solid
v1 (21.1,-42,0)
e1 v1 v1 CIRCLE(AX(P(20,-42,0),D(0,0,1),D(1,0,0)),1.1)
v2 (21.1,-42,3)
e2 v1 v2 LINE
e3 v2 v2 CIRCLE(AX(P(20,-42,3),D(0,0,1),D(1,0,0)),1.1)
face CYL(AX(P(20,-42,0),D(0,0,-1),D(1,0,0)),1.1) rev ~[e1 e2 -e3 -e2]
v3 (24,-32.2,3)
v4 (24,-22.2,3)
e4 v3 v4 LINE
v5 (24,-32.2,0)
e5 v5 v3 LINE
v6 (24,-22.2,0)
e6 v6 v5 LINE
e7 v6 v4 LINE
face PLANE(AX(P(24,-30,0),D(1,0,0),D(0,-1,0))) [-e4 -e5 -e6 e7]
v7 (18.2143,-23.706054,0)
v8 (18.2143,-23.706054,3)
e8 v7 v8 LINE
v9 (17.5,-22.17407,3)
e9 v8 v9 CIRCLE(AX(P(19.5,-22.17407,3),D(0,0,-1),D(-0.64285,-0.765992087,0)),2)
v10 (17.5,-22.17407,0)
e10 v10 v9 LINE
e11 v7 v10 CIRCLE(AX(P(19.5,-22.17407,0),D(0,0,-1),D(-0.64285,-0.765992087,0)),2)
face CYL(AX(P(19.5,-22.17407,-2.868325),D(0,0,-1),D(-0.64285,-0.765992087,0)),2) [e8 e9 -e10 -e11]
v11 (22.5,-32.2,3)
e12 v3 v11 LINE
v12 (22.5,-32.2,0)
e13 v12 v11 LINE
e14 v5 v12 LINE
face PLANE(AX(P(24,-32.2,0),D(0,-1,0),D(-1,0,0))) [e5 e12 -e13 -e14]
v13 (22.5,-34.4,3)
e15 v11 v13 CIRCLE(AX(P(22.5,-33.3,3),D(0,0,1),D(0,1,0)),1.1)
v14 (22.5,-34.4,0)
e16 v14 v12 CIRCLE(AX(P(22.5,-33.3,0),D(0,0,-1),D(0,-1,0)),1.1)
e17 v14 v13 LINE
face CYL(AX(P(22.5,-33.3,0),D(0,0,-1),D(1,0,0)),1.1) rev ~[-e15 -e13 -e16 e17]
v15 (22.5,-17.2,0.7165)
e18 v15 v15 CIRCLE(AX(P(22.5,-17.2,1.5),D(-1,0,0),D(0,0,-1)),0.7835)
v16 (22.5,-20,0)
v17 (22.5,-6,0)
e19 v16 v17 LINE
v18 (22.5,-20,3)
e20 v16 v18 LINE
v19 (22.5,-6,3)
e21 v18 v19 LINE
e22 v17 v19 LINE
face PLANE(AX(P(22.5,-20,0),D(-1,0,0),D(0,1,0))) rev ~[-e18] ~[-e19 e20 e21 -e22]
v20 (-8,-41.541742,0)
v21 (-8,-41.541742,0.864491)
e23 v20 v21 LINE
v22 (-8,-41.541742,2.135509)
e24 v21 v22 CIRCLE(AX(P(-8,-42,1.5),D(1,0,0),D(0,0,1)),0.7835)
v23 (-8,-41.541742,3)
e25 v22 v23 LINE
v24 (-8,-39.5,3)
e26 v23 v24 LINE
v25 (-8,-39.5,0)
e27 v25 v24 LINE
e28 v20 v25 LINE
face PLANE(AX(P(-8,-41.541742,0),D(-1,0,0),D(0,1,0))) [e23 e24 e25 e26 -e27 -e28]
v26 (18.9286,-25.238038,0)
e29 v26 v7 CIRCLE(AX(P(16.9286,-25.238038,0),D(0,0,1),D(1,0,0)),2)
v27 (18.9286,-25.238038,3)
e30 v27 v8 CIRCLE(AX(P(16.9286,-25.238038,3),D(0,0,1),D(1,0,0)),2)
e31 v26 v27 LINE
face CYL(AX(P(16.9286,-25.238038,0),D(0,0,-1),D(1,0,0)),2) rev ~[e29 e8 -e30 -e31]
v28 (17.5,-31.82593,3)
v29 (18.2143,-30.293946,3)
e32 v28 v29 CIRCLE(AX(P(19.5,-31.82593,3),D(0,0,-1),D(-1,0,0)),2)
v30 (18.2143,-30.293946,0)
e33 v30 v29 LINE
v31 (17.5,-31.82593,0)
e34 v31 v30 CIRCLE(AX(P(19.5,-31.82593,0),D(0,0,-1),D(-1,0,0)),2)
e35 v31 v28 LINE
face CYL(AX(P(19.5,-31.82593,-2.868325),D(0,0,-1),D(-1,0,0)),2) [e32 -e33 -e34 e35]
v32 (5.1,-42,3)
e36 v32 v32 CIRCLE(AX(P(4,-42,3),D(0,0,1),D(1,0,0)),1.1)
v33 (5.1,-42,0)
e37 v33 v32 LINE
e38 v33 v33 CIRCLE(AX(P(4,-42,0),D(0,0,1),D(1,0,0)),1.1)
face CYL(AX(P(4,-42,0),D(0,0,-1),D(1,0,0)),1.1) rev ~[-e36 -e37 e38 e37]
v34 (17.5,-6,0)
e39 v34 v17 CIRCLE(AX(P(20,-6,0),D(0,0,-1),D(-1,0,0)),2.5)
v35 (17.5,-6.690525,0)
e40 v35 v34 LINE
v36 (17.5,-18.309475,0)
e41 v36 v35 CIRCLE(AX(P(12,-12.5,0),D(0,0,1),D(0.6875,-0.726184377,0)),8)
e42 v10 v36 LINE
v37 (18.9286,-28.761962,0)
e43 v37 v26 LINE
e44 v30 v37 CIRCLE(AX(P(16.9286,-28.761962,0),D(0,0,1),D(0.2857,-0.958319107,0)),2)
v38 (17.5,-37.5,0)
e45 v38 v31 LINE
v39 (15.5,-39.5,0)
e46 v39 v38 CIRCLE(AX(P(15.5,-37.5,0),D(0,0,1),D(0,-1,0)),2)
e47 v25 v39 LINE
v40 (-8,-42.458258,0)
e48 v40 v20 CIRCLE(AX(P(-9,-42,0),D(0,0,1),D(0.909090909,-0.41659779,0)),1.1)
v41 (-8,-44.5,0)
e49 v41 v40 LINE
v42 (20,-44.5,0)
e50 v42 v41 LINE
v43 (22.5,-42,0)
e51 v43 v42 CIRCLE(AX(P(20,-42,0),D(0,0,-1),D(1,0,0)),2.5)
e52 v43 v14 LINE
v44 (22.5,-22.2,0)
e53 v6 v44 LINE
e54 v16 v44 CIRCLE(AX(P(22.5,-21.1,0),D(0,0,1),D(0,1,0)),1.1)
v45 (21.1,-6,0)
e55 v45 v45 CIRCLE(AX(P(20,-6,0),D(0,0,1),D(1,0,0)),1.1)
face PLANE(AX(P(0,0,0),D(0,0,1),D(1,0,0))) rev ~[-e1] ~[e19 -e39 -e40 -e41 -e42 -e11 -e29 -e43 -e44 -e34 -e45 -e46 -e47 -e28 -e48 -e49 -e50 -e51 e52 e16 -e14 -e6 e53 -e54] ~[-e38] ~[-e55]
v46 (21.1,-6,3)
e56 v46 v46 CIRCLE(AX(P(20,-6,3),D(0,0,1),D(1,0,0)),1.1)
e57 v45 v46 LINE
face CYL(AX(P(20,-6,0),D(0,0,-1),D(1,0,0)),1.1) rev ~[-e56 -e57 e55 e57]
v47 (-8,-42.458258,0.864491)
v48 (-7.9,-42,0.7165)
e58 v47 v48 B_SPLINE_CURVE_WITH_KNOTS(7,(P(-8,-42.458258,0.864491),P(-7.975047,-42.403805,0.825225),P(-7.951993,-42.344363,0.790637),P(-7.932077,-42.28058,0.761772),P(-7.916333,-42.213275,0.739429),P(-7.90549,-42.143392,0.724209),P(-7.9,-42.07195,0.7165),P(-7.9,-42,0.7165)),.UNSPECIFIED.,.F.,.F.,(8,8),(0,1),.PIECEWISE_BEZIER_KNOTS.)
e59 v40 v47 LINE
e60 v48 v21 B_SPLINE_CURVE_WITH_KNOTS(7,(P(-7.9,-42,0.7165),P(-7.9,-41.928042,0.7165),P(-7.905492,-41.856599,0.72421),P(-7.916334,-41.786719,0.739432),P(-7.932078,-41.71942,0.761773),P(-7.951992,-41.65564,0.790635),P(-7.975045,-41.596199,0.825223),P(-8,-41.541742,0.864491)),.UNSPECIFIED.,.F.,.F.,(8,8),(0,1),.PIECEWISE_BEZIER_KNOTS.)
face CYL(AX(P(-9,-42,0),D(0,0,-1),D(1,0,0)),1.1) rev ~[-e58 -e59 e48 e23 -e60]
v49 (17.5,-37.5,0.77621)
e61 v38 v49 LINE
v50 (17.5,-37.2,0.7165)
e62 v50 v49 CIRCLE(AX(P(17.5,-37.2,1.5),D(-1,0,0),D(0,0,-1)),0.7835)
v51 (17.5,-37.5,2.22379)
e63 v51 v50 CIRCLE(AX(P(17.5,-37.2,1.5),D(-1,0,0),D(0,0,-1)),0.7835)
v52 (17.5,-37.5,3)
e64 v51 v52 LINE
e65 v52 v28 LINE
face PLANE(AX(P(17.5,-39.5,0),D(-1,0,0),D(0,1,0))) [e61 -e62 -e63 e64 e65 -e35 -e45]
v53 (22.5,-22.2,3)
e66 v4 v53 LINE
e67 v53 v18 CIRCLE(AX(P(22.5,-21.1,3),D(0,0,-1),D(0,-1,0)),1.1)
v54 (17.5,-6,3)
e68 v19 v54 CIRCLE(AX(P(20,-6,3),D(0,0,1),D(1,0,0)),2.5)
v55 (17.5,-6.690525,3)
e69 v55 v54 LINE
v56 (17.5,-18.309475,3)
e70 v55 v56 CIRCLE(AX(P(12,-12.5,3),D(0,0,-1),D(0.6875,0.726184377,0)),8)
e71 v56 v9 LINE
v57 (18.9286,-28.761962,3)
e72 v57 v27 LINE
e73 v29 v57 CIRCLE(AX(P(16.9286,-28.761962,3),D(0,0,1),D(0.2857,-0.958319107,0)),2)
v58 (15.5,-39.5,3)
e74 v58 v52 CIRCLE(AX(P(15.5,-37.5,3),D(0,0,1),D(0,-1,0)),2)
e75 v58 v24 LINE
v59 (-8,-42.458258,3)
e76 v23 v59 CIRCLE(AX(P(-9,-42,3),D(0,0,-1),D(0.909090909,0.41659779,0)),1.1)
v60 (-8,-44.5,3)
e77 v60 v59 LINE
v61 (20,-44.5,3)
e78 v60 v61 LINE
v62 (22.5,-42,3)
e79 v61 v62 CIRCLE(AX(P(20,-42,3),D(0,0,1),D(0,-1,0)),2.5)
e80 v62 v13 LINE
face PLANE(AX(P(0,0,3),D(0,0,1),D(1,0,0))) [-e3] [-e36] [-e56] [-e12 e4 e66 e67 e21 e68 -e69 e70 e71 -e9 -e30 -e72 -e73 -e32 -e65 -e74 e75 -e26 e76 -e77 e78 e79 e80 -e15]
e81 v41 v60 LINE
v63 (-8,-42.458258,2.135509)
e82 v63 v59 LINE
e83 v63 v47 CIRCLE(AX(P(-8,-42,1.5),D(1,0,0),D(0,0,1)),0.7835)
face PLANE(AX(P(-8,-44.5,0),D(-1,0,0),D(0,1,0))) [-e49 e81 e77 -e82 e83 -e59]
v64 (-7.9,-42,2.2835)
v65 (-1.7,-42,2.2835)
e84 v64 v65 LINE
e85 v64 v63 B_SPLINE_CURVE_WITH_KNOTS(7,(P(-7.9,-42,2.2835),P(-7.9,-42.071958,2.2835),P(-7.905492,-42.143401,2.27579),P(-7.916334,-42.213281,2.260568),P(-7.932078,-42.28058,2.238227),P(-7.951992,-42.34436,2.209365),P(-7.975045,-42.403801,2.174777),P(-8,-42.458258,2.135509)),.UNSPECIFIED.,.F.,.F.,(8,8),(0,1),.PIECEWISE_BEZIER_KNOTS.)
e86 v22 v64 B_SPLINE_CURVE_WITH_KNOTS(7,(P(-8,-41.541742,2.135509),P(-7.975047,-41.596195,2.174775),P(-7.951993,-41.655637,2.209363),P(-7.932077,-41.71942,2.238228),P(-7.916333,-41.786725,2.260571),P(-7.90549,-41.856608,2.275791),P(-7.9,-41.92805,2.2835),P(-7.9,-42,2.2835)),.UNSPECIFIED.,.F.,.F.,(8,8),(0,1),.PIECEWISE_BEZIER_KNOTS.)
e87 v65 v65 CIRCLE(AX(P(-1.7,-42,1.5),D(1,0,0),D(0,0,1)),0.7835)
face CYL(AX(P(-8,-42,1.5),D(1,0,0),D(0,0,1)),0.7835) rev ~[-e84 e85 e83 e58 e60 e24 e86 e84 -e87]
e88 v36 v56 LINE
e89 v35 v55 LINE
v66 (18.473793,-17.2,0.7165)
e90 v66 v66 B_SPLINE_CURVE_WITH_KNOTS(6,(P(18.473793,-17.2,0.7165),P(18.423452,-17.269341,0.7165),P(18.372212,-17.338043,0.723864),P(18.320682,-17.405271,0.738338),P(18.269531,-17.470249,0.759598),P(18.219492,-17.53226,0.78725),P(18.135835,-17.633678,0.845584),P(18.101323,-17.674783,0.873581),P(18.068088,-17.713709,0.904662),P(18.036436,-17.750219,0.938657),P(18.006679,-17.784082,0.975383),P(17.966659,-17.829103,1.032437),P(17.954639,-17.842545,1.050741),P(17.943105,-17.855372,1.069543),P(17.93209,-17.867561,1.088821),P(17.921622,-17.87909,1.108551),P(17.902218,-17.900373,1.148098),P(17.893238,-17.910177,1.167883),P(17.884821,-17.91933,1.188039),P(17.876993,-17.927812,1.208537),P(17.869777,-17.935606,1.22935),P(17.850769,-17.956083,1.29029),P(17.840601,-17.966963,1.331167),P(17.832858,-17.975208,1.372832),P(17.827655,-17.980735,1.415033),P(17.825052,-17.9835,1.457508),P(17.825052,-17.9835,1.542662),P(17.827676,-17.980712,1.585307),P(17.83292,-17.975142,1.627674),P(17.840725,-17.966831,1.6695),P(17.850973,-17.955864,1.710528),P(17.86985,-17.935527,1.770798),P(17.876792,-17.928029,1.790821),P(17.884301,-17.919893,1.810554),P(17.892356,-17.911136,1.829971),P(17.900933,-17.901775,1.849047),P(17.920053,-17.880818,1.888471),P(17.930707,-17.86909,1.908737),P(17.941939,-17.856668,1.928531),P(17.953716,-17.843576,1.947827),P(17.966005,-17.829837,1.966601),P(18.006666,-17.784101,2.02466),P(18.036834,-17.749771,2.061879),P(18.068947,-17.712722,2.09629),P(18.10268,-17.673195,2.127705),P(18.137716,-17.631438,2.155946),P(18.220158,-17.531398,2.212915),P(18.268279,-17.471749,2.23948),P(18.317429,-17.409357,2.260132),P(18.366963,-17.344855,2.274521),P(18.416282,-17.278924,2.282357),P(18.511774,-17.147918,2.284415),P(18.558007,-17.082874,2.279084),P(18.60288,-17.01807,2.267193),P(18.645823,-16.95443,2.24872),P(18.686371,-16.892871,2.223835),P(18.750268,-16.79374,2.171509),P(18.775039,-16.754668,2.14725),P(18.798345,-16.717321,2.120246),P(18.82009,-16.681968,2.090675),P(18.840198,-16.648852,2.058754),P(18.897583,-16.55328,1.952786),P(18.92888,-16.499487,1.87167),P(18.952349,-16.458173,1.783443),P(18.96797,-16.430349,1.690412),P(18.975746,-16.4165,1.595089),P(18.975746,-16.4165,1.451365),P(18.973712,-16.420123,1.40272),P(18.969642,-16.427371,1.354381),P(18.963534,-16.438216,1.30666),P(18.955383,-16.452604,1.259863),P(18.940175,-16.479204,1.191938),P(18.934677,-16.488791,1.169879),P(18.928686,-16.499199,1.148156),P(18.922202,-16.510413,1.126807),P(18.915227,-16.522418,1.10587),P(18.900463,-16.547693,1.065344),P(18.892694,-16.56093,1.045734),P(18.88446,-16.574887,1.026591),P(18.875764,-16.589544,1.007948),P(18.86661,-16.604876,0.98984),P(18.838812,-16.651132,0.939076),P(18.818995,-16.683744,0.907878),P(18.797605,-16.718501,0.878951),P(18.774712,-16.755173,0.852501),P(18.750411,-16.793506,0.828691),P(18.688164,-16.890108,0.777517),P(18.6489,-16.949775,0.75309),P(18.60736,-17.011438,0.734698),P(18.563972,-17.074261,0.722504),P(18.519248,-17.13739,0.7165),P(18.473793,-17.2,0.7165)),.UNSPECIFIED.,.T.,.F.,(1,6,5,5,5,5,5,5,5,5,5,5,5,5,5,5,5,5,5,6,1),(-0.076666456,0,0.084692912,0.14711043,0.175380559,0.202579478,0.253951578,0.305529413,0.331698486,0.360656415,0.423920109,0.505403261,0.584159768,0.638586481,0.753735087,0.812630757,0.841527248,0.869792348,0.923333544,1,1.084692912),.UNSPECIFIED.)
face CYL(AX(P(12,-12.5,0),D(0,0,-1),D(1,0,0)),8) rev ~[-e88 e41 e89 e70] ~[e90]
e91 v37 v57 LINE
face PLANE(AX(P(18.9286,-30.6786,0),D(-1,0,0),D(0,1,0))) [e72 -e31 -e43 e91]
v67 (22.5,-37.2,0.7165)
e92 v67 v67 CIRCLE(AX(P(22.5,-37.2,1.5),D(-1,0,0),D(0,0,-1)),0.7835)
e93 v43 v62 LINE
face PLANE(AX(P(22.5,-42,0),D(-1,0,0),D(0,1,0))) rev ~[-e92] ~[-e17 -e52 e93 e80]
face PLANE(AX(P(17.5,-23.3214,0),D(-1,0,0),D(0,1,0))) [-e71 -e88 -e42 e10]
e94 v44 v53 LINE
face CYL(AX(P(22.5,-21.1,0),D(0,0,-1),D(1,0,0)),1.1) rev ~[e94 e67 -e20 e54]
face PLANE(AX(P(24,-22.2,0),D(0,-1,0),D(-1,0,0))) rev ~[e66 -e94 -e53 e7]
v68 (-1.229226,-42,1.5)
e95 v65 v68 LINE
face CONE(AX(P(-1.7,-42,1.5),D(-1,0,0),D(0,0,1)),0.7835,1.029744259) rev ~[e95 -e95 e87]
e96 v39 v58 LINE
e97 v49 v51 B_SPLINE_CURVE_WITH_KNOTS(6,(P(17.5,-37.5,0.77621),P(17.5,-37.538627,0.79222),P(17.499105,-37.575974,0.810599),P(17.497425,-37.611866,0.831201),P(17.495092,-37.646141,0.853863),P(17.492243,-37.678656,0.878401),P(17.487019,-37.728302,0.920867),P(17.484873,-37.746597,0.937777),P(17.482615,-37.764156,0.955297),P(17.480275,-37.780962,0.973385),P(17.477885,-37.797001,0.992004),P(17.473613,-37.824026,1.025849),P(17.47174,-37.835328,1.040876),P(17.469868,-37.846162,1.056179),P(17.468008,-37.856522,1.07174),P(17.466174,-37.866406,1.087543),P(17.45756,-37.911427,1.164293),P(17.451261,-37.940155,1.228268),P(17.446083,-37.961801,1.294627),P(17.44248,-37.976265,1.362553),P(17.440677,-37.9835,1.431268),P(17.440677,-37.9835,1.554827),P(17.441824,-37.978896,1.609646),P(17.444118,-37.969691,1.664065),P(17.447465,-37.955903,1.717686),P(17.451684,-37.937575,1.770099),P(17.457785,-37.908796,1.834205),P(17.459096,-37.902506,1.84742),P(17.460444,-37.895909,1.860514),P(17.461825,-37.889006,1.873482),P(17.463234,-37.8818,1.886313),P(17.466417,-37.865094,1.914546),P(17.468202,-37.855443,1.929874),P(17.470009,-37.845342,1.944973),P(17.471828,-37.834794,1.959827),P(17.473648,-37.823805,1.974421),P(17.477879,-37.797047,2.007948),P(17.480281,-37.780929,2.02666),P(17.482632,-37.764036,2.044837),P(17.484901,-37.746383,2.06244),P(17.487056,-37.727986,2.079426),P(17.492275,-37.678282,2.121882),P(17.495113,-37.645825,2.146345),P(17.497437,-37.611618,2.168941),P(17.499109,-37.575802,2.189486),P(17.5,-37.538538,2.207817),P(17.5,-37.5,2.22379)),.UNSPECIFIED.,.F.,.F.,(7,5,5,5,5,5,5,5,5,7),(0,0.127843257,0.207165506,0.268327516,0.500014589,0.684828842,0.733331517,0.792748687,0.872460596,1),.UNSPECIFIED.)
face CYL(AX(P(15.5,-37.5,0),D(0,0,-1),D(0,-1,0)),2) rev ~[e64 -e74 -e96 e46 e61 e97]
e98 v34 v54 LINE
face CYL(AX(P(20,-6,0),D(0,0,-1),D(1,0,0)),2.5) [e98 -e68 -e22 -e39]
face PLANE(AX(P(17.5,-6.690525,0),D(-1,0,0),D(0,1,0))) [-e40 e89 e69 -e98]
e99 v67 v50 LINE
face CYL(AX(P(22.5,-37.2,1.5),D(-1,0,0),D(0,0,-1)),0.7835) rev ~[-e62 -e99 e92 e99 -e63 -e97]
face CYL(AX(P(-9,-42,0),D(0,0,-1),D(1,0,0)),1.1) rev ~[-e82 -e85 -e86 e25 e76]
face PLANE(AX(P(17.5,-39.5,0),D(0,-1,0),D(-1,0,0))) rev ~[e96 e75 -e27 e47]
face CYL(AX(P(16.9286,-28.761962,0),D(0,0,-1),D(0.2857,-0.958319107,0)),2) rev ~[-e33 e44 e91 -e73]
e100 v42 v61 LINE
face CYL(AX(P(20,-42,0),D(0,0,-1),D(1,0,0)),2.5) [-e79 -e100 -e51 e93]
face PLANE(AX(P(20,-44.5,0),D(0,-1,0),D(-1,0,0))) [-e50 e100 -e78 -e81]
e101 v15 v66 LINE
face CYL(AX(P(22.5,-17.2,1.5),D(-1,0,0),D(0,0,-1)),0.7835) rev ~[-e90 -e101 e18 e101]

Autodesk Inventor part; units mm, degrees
ref_plane "YZ Plane" through (0, 0, 0) normal (1, 0, 0) x (0, 1, 0)
ref_plane "XZ Plane" through (0, 0, 0) normal (0, 1, 0) x (-1, 0, 0)
ref_plane "XY Plane" through (0, 0, 0) normal (0, 0, 1) x (1, 0, 0)
sketch "スケッチ1" plane through (0, 0, 0) normal (0, 0, 1) x (1, 0, 0)
  circle A0 centre (20, -42) radius 1 projected
  circle A1 centre (4, -42) radius 1 projected
  circle A2 centre (20, -6) radius 1 projected
  circle A3 centre (20, -42) radius 1.1
  line L0 (22.5, -78.2) -> (22.5, -32.2) projected
  circle A4 centre (20, -42) radius 2.5
  circle A5 centre (20, -6) radius 2.5
  circle A6 centre (20, -6) radius 1.1
  circle A7 centre (4, -42) radius 1.1
  circle A8 centre (4, -42) radius 2.5
  line L1 (-8, -45.7) -> (-8, -64.7) projected
  line L2 (-8, -44.5) -> (-8, -39.5)
  line L3 (17.5, -42) -> (17.5, -6)
  line L4 (20, -39.5) -> (-8, -39.5)
  line L5 (20, -44.5) -> (4, -44.5)
  line L6 (4, -44.5) -> (-8, -44.5)
  line L7 (24, -24.4) -> (24, -30) projected
  line L8 (24, -32.2) -> (22.5, -32.2) projected
  line L9 (24, -22.2) -> (22.5, -22.2) projected
  line L10 (24, -32.2) -> (22.5, -32.2)
  line L11 (22.5, -32.2) -> (22.5, -22.2)
  line L12 (22.5, -22.2) -> (24, -22.2)
  line L13 (24, -22.2) -> (24, -32.2)
  line L14 (22.5, -22.2) -> (22.5, -6)
  line L15 (2, -43.5) -> (2, -4.5) projected
  arc A9 (2, -43.5) -> (2.5, -44) centre (2.5, -43.5) ccw projected
  line L16 (21.5, -44) -> (2.5, -44) projected
  arc A10 (21.5, -44) -> (22, -43.5) centre (21.5, -43.5) ccw projected
  line L17 (22, -4.5) -> (22, -43.5) projected
  arc A11 (22, -4.5) -> (21.5, -4) centre (21.5, -4.5) ccw projected
  line L18 (2.5, -4) -> (21.5, -4) projected
  arc A12 (2.5, -4) -> (2, -4.5) centre (2.5, -4.5) ccw projected
  line L19 (18.4286, -23.8214) -> (18.4286, -30.1786) projected
  line L20 (18.4286, -30.1786) -> (14.5714, -30.1786) projected
  line L21 (14.5714, -30.1786) -> (14.5714, -23.8214) projected
  line L22 (14.5714, -23.8214) -> (18.4286, -23.8214) projected
  circle A13 centre (12, -31.4) radius 1.1519 projected
  line L23 (5.5714, -23.8214) -> (9.4286, -23.8214) projected
  line L24 (9.4286, -23.8214) -> (9.4286, -30.1786) projected
  line L25 (9.4286, -30.1786) -> (5.5714, -30.1786) projected
  line L26 (5.5714, -30.1786) -> (5.5714, -23.8214) projected
  circle A14 centre (20, -6) radius 1.8131 projected
  circle A15 centre (4, -6) radius 1.8131 projected
  circle A16 centre (20, -42) radius 1.8131 projected
  circle A17 centre (4, -42) radius 1.8131 projected
  arc A18 (18.25, -12.4893) -> (5.75, -12.5) centre (12, -12.5) ccw projected
  arc A19 (18.5, -12.25) -> (18.2502, -12.4893) centre (18.5, -12.5) ccw projected
  line L27 (18.5, -12.25) -> (20.25, -12.25) projected
  arc A20 (20.25, -12.75) -> (20.25, -12.25) centre (20.25, -12.5) ccw projected
  line L28 (20.25, -12.75) -> (18.5, -12.75) projected
  arc A21 (18.25, -12.5) -> (18.5, -12.75) centre (18.5, -12.5) ccw projected
  arc A22 (17.7742, -14.8918) -> (18.25, -12.5) centre (12, -12.5) ccw projected
  arc A23 (18.1009, -14.7565) -> (17.7742, -14.8918) centre (18.0052, -14.9874) ccw projected
  line L29 (18.1009, -14.7565) -> (19.7177, -15.4262) projected
  arc A24 (19.5263, -15.8881) -> (19.7177, -15.4262) centre (19.622, -15.6571) ccw projected
  line L30 (19.5263, -15.8881) -> (17.9095, -15.2184) projected
  arc A25 (17.7742, -14.8918) -> (17.9095, -15.2184) centre (18.0052, -14.9874) ccw projected
  arc A26 (16.4194, -16.9194) -> (17.7742, -14.8918) centre (12, -12.5) ccw projected
  arc A27 (16.773, -16.9194) -> (16.4194, -16.9194) centre (16.5962, -17.0962) ccw projected
  line L31 (16.773, -16.9194) -> (18.0104, -18.1569) projected
  arc A28 (17.6569, -18.5104) -> (18.0104, -18.1569) centre (17.8336, -18.3336) ccw projected
  line L32 (17.6569, -18.5104) -> (16.4194, -17.273) projected
  arc A29 (16.4194, -16.9194) -> (16.4194, -17.273) centre (16.5962, -17.0962) ccw projected
  arc A30 (14.3918, -18.2742) -> (16.4194, -16.9194) centre (12, -12.5) ccw projected
  arc A31 (14.7184, -18.4095) -> (14.3918, -18.2742) centre (14.4874, -18.5052) ccw projected
  line L33 (14.7184, -18.4095) -> (15.3881, -20.0263) projected
  arc A32 (14.9262, -20.2177) -> (15.3881, -20.0263) centre (15.1571, -20.122) ccw projected
  line L34 (14.9262, -20.2177) -> (14.2565, -18.6009) projected
  arc A33 (14.3918, -18.2742) -> (14.2565, -18.6009) centre (14.4874, -18.5052) ccw projected
  arc A34 (12, -18.75) -> (14.3918, -18.2742) centre (12, -12.5) ccw projected
  arc A35 (12.25, -19) -> (12, -18.75) centre (12, -19) ccw projected
  line L35 (12.25, -19) -> (12.25, -20.75) projected
  arc A36 (11.75, -20.75) -> (12.25, -20.75) centre (12, -20.75) ccw projected
  line L36 (11.75, -20.75) -> (11.75, -19) projected
  arc A37 (12, -18.75) -> (11.75, -19) centre (12, -19) ccw projected
  arc A38 (9.6082, -18.2742) -> (12, -18.75) centre (12, -12.5) ccw projected
  arc A39 (9.7435, -18.6009) -> (9.6082, -18.2742) centre (9.5126, -18.5052) ccw projected
  line L37 (9.7435, -18.6009) -> (9.0738, -20.2177) projected
  arc A40 (8.6119, -20.0263) -> (9.0738, -20.2177) centre (8.8429, -20.122) ccw projected
  line L38 (8.6119, -20.0263) -> (9.2816, -18.4095) projected
  arc A41 (9.6082, -18.2742) -> (9.2816, -18.4095) centre (9.5126, -18.5052) ccw projected
  arc A42 (7.5806, -16.9194) -> (9.6082, -18.2742) centre (12, -12.5) ccw projected
  arc A43 (7.5806, -17.273) -> (7.5806, -16.9194) centre (7.4038, -17.0962) ccw projected
  line L39 (7.5806, -17.273) -> (6.3431, -18.5104) projected
  arc A44 (5.9896, -18.1569) -> (6.3431, -18.5104) centre (6.1664, -18.3336) ccw projected
  line L40 (5.9896, -18.1569) -> (7.227, -16.9194) projected
  arc A45 (7.5806, -16.9194) -> (7.227, -16.9194) centre (7.4038, -17.0962) ccw projected
  arc A46 (6.2258, -14.8918) -> (7.5806, -16.9194) centre (12, -12.5) ccw projected
  arc A47 (6.0905, -15.2184) -> (6.2258, -14.8918) centre (5.9948, -14.9874) ccw projected
  line L41 (6.0905, -15.2184) -> (4.4737, -15.8881) projected
  arc A48 (4.2823, -15.4262) -> (4.4737, -15.8881) centre (4.378, -15.6571) ccw projected
  line L42 (4.2823, -15.4262) -> (5.8991, -14.7565) projected
  arc A49 (6.2258, -14.8918) -> (5.8991, -14.7565) centre (5.9948, -14.9874) ccw projected
  arc A50 (5.75, -12.5) -> (6.2258, -14.8918) centre (12, -12.5) ccw projected
  arc A51 (5.5, -12.75) -> (5.75, -12.5) centre (5.5, -12.5) ccw projected
  line L43 (5.5, -12.75) -> (3.75, -12.75) projected
  arc A52 (3.75, -12.25) -> (3.75, -12.75) centre (3.75, -12.5) ccw projected
  line L44 (3.75, -12.25) -> (5.5, -12.25) projected
  arc A53 (5.75, -12.5) -> (5.5, -12.25) centre (5.5, -12.5) ccw projected
  line L45 (18.9286, -30.6786) -> (18.9286, -23.3214)
  line L46 (18.9286, -23.3214) -> (14.0714, -23.3214)
  line L47 (14.0714, -23.3214) -> (14.0714, -30.6786)
  line L48 (14.0714, -30.6786) -> (18.9286, -30.6786)
  circle A54 centre (22.5, -21.1) radius 1.1
  circle A55 centre (22.5, -33.3) radius 1.1
  circle A56 centre (-9, -42) radius 1.1
  circle A57 centre (12, -12.5) radius 6.25
  circle A58 centre (12, -12.5) radius 8
  point P0 (0, 0)
  point P1 (-8, -42)
  point P2 (-8, -41.5417)
  point P3 (-8, -42.4583)
  point P4 (22.5, -42)
  point P5 (22.5, -34.4)
  point P6 (22.5, -20)
  point P7 (17.5, -9.5314)
  point P8 (18.25, -12.5)
  point P9 (17.5, -15.4686)
  point P10 (17.5, -17.6464)
  point P11 (17.5, -18.3536)
  point P12 (17.5, -23.3214)
  point P13 (17.5, -30.6786)
  point P14 (17.5, -39.5)
  point P15 (17.5, -6.6905)
  point P16 (17.5, -18.3095)
  dimension "d0" = 2.2
  dimension "d1" = 2.2
  dimension "d2" = 2.2
  dimension "d3" = 0.5
  dimension "d4" = 2.2
  dimension "d5" = 2.2
  dimension "d6" = 2.2
  dimension "d7" = 1
extrude "押し出し1" add sketch "スケッチ1" along normal blind 3 contours A4 L17 A55 L0 | A4 L17 | A4 L16 L17 | A4 L4 L3 L48 L45 L46 L32 A28 L31 A58 L30 A24 L29 L28 A20 L27 A5 L17 A54 A55 | L11 L9 L13 L7 L8 | A55 L17 A54 L11 | A4 L16 | A4 L3 L4 | L5 A8 L16 A4 | L16 A8 L4 L3 A4 | A54 L17 A5 L14 | L6 L2 A56 L4 L15 A8 A9 | A8 L16 | L16 A8 L15 | A8 L15 L4 | A5 L17 | A9 A8 | L15 A8 | L17 A5 A58 L18 | L18 A5 | A58 L3 A5 | L27 A20 L28 A58 | L3 A58 L31 A28 L32 | L29 A24 L30 A58 | A14 | A16 | A17
fillet "フィレット1" radius 2 4 edges at (17.5, -30.6786, 1.5) (18.9286, -30.6786, 1.5) (17.5, -23.3214, 1.5) (18.9286, -23.3214, 1.5)
sketch "スケッチ2" plane through (22.5, -42, 0) normal (1, 0, 0) x (0, 0, -1)
  circle A0 centre (-1.5, 24.8) radius 1.1 projected
  circle A1 centre (-1.5, 4.8) radius 1.1 projected
  point P0 (0, 42)
hole "穴1" at (22.5, -17.2, 1.5) at (22.5, -37.2, 1.5) direction (-1, 0, 0) diameter 1.567 depth 6.3 tip angle 118 thread size "M2x0.4" class "6H" standard "ISO Metric profile"
sketch "スケッチ3" plane through (-8, -44.5, 0) normal (-1, 0, 0) x (0, 0, 1)
  line L0 (0, 2.5) -> (3, 2.5) projected
  point P0 (0, 44.5)
  point P1 (1.5, 2.5)
hole "穴2" at (-8, -42, 1.5) direction (1, 0, 0) diameter 1.567 depth 6.3 tip angle 118 thread size "M2x0.4" class "6H" standard "ISO Metric profile"
fillet "フィレット2" radius 2 1 edges at (17.5, -39.5, 1.5)
properties part number "mata3" material "アルミニウム 2014-T4"
